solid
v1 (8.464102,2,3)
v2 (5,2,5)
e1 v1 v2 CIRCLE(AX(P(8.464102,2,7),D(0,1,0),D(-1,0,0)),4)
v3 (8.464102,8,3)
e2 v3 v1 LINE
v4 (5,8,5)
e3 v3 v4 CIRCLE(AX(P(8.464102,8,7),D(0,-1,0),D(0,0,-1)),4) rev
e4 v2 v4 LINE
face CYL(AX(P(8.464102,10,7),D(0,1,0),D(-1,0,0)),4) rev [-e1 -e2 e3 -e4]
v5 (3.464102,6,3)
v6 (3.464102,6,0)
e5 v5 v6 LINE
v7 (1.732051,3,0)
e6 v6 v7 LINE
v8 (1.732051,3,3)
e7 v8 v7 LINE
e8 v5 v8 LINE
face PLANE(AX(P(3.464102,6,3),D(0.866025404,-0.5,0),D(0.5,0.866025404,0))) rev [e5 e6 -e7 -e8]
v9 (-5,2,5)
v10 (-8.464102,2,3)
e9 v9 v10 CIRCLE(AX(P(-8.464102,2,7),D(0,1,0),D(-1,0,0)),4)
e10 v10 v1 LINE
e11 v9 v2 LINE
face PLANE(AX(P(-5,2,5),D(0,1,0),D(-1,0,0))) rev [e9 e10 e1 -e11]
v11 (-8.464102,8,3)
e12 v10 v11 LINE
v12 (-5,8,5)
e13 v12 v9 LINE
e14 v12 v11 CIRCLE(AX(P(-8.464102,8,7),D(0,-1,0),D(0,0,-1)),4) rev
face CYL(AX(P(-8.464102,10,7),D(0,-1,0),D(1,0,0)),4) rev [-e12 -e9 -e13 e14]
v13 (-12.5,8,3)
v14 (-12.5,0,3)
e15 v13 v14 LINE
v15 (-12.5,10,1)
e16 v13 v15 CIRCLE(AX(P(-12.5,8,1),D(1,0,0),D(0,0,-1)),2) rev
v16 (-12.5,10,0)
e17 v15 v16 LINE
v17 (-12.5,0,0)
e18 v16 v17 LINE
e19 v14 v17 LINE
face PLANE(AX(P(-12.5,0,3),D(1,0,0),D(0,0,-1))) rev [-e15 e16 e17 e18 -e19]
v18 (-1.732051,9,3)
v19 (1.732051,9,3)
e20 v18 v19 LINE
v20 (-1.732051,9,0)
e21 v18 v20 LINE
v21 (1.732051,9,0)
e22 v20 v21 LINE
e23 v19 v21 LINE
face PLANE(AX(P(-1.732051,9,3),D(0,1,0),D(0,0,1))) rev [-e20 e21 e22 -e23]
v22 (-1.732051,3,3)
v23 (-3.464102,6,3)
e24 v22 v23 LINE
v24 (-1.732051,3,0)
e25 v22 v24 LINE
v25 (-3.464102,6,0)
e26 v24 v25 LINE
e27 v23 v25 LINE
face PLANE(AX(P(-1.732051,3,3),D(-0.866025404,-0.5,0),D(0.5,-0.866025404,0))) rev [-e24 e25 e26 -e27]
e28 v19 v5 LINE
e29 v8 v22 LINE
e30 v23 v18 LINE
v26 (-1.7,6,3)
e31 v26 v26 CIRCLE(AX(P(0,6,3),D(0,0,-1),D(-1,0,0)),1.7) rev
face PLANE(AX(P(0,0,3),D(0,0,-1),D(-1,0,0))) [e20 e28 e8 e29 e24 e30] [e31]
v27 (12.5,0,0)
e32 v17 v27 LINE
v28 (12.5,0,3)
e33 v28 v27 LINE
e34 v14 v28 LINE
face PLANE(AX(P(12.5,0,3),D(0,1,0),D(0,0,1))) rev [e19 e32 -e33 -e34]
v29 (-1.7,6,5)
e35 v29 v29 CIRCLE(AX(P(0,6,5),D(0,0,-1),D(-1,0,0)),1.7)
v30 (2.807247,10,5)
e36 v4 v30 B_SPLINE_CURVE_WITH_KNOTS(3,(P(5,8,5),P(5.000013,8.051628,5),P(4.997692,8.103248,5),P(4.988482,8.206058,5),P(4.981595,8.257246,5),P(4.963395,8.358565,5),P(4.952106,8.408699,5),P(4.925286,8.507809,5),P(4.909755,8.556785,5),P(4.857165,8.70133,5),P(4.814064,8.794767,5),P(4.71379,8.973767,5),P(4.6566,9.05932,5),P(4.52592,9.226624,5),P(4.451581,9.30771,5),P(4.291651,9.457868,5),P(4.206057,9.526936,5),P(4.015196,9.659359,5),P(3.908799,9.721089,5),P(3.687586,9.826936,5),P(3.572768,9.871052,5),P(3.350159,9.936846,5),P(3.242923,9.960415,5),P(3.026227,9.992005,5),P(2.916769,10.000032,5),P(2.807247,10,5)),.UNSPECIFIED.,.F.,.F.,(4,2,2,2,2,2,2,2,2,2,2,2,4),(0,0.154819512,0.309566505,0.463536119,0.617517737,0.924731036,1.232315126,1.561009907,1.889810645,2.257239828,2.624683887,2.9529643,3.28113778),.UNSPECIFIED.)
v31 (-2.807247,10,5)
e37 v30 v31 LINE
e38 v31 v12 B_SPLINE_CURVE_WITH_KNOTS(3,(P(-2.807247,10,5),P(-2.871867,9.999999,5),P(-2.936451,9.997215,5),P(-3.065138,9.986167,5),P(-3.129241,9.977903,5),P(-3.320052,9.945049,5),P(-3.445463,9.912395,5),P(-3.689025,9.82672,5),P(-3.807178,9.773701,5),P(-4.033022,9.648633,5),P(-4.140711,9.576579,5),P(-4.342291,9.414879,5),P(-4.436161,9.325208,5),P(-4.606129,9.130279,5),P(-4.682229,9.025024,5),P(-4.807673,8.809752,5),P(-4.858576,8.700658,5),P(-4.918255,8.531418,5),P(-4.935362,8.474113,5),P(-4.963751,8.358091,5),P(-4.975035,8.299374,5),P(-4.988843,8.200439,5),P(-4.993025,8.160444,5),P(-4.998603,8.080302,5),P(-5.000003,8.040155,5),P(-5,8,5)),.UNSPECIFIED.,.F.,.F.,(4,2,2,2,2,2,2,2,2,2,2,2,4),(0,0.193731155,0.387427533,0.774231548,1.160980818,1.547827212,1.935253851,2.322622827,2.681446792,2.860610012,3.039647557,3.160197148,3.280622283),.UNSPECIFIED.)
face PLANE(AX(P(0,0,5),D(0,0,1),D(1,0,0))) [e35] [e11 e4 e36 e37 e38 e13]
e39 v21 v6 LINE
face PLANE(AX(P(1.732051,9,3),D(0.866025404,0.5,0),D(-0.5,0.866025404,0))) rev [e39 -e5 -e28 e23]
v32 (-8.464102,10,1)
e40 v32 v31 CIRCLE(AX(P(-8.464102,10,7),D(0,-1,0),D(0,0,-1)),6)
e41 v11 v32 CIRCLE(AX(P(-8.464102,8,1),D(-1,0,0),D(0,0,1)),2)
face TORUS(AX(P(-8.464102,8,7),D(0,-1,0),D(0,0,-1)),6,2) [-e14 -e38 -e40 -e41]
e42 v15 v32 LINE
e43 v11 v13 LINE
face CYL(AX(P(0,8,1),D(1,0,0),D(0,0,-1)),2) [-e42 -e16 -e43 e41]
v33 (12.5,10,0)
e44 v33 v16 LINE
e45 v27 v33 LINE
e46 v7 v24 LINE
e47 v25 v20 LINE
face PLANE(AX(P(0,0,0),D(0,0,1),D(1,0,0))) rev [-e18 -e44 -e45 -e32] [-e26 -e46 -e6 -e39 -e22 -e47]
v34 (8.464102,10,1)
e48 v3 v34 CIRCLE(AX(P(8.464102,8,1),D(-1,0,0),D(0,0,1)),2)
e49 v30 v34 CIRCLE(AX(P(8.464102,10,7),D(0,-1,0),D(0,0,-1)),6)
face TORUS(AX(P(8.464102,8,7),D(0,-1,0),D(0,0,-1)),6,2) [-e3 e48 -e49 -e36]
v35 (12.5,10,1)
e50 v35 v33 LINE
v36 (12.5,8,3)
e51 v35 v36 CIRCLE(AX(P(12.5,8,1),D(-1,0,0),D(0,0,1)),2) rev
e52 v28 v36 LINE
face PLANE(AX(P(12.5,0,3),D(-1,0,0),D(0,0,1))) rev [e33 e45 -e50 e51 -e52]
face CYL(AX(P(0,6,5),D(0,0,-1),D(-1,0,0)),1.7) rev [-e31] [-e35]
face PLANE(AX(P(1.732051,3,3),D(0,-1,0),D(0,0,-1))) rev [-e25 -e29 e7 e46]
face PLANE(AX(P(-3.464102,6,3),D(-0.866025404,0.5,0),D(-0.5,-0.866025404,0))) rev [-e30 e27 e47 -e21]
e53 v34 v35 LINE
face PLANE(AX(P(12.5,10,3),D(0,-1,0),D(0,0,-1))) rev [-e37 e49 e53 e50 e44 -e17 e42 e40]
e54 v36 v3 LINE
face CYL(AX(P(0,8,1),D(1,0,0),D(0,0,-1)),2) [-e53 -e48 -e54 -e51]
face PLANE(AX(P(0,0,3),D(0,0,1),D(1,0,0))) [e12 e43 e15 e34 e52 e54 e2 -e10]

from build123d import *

# Parameters (mm, degrees)
SKETCH2_W           = 25
SKETCH2_H           = 10
BOSS_EXTRUDE1_DEPTH = 3
SKETCH5_W           = 10
SKETCH5_H           = 8
BOSS_EXTRUDE3_DEPTH = 2
FILLET2_R           = 4
SKETCH8_R           = 1.7
CUT_EXTRUDE3_DEPTH  = 17.770509831
CUT_EXTRUDE4_DEPTH  = 3
FILLET3_R           = 2


with BuildPart() as part:
    # Sketch2 → Boss-Extrude1 (new body)
    with BuildSketch(Plane.XY):
        with Locations((0, 5)):
            Rectangle(SKETCH2_W, SKETCH2_H)
    extrude(amount=BOSS_EXTRUDE1_DEPTH)

    # Sketch5 → Boss-Extrude3 (add)
    with BuildSketch(Plane.XY.offset(3)):
        with Locations((0, 6)):
            Rectangle(SKETCH5_W, SKETCH5_H)
    extrude(amount=BOSS_EXTRUDE3_DEPTH)

    # Fillet2
    # the kernel refuses this fillet: 4 mm, written as the material it adds along each edge
    with BuildSketch(Plane(origin=(5, 10, 3), x_dir=(1, 0, 0), z_dir=(0, -1, 0)), Plane(origin=(-5, 2, 3), x_dir=(-1, 0, 0), z_dir=(0, 1, 0))) as fillet2_piece_1:
        with BuildLine():
            CenterArc((3.464101615, 4), FILLET2_R, 210, 60)
            Line((0, 2), (-0.069282032, 1.96))
            ThreePointArc((-0.069282032, 1.96), (-0.08, 1), (-0.08, 0))
            Line((-0.08, 0), (0, -0.08))
            Line((0, -0.08), (3.464101615, -0.08))
            Line((3.464101615, -0.08), (3.464101615, 0))
        make_face()
    extrude(amount=8)

    # Sketch8 → Cut-Extrude3 (cut, through all)
    with BuildSketch(Plane(origin=(0, 0, 0), x_dir=(-1, 0, 0), z_dir=(0, 0, -1))):
        with Locations((0, 6)):
            Circle(SKETCH8_R)
    extrude(amount=-CUT_EXTRUDE3_DEPTH, mode=Mode.SUBTRACT)

    # Sketch9 → Cut-Extrude4 (cut)
    with BuildSketch(Plane(origin=(0, 0, 0), x_dir=(-1, 0, 0), z_dir=(0, 0, -1))):
        Polygon((3.464101615, 6), (1.732050808, 9), (-1.732050808, 9), (-3.464101615, 6), (-1.732050808, 3), (1.732050808, 3), align=None)
    extrude(amount=-CUT_EXTRUDE4_DEPTH, mode=Mode.SUBTRACT)

    # Fillet3
    fillet3_edges = [part.edges().sort_by_distance(p)[0] for p in [
        (-10.482050808, 10, 3),
        (6.464101615, 10, 3.535898385),
        (-6.464101615, 10, 3.535898385),
        (10.482050808, 10, 3),
    ]]
    fillet(fillet3_edges, radius=FILLET3_R)


solid = part.part
